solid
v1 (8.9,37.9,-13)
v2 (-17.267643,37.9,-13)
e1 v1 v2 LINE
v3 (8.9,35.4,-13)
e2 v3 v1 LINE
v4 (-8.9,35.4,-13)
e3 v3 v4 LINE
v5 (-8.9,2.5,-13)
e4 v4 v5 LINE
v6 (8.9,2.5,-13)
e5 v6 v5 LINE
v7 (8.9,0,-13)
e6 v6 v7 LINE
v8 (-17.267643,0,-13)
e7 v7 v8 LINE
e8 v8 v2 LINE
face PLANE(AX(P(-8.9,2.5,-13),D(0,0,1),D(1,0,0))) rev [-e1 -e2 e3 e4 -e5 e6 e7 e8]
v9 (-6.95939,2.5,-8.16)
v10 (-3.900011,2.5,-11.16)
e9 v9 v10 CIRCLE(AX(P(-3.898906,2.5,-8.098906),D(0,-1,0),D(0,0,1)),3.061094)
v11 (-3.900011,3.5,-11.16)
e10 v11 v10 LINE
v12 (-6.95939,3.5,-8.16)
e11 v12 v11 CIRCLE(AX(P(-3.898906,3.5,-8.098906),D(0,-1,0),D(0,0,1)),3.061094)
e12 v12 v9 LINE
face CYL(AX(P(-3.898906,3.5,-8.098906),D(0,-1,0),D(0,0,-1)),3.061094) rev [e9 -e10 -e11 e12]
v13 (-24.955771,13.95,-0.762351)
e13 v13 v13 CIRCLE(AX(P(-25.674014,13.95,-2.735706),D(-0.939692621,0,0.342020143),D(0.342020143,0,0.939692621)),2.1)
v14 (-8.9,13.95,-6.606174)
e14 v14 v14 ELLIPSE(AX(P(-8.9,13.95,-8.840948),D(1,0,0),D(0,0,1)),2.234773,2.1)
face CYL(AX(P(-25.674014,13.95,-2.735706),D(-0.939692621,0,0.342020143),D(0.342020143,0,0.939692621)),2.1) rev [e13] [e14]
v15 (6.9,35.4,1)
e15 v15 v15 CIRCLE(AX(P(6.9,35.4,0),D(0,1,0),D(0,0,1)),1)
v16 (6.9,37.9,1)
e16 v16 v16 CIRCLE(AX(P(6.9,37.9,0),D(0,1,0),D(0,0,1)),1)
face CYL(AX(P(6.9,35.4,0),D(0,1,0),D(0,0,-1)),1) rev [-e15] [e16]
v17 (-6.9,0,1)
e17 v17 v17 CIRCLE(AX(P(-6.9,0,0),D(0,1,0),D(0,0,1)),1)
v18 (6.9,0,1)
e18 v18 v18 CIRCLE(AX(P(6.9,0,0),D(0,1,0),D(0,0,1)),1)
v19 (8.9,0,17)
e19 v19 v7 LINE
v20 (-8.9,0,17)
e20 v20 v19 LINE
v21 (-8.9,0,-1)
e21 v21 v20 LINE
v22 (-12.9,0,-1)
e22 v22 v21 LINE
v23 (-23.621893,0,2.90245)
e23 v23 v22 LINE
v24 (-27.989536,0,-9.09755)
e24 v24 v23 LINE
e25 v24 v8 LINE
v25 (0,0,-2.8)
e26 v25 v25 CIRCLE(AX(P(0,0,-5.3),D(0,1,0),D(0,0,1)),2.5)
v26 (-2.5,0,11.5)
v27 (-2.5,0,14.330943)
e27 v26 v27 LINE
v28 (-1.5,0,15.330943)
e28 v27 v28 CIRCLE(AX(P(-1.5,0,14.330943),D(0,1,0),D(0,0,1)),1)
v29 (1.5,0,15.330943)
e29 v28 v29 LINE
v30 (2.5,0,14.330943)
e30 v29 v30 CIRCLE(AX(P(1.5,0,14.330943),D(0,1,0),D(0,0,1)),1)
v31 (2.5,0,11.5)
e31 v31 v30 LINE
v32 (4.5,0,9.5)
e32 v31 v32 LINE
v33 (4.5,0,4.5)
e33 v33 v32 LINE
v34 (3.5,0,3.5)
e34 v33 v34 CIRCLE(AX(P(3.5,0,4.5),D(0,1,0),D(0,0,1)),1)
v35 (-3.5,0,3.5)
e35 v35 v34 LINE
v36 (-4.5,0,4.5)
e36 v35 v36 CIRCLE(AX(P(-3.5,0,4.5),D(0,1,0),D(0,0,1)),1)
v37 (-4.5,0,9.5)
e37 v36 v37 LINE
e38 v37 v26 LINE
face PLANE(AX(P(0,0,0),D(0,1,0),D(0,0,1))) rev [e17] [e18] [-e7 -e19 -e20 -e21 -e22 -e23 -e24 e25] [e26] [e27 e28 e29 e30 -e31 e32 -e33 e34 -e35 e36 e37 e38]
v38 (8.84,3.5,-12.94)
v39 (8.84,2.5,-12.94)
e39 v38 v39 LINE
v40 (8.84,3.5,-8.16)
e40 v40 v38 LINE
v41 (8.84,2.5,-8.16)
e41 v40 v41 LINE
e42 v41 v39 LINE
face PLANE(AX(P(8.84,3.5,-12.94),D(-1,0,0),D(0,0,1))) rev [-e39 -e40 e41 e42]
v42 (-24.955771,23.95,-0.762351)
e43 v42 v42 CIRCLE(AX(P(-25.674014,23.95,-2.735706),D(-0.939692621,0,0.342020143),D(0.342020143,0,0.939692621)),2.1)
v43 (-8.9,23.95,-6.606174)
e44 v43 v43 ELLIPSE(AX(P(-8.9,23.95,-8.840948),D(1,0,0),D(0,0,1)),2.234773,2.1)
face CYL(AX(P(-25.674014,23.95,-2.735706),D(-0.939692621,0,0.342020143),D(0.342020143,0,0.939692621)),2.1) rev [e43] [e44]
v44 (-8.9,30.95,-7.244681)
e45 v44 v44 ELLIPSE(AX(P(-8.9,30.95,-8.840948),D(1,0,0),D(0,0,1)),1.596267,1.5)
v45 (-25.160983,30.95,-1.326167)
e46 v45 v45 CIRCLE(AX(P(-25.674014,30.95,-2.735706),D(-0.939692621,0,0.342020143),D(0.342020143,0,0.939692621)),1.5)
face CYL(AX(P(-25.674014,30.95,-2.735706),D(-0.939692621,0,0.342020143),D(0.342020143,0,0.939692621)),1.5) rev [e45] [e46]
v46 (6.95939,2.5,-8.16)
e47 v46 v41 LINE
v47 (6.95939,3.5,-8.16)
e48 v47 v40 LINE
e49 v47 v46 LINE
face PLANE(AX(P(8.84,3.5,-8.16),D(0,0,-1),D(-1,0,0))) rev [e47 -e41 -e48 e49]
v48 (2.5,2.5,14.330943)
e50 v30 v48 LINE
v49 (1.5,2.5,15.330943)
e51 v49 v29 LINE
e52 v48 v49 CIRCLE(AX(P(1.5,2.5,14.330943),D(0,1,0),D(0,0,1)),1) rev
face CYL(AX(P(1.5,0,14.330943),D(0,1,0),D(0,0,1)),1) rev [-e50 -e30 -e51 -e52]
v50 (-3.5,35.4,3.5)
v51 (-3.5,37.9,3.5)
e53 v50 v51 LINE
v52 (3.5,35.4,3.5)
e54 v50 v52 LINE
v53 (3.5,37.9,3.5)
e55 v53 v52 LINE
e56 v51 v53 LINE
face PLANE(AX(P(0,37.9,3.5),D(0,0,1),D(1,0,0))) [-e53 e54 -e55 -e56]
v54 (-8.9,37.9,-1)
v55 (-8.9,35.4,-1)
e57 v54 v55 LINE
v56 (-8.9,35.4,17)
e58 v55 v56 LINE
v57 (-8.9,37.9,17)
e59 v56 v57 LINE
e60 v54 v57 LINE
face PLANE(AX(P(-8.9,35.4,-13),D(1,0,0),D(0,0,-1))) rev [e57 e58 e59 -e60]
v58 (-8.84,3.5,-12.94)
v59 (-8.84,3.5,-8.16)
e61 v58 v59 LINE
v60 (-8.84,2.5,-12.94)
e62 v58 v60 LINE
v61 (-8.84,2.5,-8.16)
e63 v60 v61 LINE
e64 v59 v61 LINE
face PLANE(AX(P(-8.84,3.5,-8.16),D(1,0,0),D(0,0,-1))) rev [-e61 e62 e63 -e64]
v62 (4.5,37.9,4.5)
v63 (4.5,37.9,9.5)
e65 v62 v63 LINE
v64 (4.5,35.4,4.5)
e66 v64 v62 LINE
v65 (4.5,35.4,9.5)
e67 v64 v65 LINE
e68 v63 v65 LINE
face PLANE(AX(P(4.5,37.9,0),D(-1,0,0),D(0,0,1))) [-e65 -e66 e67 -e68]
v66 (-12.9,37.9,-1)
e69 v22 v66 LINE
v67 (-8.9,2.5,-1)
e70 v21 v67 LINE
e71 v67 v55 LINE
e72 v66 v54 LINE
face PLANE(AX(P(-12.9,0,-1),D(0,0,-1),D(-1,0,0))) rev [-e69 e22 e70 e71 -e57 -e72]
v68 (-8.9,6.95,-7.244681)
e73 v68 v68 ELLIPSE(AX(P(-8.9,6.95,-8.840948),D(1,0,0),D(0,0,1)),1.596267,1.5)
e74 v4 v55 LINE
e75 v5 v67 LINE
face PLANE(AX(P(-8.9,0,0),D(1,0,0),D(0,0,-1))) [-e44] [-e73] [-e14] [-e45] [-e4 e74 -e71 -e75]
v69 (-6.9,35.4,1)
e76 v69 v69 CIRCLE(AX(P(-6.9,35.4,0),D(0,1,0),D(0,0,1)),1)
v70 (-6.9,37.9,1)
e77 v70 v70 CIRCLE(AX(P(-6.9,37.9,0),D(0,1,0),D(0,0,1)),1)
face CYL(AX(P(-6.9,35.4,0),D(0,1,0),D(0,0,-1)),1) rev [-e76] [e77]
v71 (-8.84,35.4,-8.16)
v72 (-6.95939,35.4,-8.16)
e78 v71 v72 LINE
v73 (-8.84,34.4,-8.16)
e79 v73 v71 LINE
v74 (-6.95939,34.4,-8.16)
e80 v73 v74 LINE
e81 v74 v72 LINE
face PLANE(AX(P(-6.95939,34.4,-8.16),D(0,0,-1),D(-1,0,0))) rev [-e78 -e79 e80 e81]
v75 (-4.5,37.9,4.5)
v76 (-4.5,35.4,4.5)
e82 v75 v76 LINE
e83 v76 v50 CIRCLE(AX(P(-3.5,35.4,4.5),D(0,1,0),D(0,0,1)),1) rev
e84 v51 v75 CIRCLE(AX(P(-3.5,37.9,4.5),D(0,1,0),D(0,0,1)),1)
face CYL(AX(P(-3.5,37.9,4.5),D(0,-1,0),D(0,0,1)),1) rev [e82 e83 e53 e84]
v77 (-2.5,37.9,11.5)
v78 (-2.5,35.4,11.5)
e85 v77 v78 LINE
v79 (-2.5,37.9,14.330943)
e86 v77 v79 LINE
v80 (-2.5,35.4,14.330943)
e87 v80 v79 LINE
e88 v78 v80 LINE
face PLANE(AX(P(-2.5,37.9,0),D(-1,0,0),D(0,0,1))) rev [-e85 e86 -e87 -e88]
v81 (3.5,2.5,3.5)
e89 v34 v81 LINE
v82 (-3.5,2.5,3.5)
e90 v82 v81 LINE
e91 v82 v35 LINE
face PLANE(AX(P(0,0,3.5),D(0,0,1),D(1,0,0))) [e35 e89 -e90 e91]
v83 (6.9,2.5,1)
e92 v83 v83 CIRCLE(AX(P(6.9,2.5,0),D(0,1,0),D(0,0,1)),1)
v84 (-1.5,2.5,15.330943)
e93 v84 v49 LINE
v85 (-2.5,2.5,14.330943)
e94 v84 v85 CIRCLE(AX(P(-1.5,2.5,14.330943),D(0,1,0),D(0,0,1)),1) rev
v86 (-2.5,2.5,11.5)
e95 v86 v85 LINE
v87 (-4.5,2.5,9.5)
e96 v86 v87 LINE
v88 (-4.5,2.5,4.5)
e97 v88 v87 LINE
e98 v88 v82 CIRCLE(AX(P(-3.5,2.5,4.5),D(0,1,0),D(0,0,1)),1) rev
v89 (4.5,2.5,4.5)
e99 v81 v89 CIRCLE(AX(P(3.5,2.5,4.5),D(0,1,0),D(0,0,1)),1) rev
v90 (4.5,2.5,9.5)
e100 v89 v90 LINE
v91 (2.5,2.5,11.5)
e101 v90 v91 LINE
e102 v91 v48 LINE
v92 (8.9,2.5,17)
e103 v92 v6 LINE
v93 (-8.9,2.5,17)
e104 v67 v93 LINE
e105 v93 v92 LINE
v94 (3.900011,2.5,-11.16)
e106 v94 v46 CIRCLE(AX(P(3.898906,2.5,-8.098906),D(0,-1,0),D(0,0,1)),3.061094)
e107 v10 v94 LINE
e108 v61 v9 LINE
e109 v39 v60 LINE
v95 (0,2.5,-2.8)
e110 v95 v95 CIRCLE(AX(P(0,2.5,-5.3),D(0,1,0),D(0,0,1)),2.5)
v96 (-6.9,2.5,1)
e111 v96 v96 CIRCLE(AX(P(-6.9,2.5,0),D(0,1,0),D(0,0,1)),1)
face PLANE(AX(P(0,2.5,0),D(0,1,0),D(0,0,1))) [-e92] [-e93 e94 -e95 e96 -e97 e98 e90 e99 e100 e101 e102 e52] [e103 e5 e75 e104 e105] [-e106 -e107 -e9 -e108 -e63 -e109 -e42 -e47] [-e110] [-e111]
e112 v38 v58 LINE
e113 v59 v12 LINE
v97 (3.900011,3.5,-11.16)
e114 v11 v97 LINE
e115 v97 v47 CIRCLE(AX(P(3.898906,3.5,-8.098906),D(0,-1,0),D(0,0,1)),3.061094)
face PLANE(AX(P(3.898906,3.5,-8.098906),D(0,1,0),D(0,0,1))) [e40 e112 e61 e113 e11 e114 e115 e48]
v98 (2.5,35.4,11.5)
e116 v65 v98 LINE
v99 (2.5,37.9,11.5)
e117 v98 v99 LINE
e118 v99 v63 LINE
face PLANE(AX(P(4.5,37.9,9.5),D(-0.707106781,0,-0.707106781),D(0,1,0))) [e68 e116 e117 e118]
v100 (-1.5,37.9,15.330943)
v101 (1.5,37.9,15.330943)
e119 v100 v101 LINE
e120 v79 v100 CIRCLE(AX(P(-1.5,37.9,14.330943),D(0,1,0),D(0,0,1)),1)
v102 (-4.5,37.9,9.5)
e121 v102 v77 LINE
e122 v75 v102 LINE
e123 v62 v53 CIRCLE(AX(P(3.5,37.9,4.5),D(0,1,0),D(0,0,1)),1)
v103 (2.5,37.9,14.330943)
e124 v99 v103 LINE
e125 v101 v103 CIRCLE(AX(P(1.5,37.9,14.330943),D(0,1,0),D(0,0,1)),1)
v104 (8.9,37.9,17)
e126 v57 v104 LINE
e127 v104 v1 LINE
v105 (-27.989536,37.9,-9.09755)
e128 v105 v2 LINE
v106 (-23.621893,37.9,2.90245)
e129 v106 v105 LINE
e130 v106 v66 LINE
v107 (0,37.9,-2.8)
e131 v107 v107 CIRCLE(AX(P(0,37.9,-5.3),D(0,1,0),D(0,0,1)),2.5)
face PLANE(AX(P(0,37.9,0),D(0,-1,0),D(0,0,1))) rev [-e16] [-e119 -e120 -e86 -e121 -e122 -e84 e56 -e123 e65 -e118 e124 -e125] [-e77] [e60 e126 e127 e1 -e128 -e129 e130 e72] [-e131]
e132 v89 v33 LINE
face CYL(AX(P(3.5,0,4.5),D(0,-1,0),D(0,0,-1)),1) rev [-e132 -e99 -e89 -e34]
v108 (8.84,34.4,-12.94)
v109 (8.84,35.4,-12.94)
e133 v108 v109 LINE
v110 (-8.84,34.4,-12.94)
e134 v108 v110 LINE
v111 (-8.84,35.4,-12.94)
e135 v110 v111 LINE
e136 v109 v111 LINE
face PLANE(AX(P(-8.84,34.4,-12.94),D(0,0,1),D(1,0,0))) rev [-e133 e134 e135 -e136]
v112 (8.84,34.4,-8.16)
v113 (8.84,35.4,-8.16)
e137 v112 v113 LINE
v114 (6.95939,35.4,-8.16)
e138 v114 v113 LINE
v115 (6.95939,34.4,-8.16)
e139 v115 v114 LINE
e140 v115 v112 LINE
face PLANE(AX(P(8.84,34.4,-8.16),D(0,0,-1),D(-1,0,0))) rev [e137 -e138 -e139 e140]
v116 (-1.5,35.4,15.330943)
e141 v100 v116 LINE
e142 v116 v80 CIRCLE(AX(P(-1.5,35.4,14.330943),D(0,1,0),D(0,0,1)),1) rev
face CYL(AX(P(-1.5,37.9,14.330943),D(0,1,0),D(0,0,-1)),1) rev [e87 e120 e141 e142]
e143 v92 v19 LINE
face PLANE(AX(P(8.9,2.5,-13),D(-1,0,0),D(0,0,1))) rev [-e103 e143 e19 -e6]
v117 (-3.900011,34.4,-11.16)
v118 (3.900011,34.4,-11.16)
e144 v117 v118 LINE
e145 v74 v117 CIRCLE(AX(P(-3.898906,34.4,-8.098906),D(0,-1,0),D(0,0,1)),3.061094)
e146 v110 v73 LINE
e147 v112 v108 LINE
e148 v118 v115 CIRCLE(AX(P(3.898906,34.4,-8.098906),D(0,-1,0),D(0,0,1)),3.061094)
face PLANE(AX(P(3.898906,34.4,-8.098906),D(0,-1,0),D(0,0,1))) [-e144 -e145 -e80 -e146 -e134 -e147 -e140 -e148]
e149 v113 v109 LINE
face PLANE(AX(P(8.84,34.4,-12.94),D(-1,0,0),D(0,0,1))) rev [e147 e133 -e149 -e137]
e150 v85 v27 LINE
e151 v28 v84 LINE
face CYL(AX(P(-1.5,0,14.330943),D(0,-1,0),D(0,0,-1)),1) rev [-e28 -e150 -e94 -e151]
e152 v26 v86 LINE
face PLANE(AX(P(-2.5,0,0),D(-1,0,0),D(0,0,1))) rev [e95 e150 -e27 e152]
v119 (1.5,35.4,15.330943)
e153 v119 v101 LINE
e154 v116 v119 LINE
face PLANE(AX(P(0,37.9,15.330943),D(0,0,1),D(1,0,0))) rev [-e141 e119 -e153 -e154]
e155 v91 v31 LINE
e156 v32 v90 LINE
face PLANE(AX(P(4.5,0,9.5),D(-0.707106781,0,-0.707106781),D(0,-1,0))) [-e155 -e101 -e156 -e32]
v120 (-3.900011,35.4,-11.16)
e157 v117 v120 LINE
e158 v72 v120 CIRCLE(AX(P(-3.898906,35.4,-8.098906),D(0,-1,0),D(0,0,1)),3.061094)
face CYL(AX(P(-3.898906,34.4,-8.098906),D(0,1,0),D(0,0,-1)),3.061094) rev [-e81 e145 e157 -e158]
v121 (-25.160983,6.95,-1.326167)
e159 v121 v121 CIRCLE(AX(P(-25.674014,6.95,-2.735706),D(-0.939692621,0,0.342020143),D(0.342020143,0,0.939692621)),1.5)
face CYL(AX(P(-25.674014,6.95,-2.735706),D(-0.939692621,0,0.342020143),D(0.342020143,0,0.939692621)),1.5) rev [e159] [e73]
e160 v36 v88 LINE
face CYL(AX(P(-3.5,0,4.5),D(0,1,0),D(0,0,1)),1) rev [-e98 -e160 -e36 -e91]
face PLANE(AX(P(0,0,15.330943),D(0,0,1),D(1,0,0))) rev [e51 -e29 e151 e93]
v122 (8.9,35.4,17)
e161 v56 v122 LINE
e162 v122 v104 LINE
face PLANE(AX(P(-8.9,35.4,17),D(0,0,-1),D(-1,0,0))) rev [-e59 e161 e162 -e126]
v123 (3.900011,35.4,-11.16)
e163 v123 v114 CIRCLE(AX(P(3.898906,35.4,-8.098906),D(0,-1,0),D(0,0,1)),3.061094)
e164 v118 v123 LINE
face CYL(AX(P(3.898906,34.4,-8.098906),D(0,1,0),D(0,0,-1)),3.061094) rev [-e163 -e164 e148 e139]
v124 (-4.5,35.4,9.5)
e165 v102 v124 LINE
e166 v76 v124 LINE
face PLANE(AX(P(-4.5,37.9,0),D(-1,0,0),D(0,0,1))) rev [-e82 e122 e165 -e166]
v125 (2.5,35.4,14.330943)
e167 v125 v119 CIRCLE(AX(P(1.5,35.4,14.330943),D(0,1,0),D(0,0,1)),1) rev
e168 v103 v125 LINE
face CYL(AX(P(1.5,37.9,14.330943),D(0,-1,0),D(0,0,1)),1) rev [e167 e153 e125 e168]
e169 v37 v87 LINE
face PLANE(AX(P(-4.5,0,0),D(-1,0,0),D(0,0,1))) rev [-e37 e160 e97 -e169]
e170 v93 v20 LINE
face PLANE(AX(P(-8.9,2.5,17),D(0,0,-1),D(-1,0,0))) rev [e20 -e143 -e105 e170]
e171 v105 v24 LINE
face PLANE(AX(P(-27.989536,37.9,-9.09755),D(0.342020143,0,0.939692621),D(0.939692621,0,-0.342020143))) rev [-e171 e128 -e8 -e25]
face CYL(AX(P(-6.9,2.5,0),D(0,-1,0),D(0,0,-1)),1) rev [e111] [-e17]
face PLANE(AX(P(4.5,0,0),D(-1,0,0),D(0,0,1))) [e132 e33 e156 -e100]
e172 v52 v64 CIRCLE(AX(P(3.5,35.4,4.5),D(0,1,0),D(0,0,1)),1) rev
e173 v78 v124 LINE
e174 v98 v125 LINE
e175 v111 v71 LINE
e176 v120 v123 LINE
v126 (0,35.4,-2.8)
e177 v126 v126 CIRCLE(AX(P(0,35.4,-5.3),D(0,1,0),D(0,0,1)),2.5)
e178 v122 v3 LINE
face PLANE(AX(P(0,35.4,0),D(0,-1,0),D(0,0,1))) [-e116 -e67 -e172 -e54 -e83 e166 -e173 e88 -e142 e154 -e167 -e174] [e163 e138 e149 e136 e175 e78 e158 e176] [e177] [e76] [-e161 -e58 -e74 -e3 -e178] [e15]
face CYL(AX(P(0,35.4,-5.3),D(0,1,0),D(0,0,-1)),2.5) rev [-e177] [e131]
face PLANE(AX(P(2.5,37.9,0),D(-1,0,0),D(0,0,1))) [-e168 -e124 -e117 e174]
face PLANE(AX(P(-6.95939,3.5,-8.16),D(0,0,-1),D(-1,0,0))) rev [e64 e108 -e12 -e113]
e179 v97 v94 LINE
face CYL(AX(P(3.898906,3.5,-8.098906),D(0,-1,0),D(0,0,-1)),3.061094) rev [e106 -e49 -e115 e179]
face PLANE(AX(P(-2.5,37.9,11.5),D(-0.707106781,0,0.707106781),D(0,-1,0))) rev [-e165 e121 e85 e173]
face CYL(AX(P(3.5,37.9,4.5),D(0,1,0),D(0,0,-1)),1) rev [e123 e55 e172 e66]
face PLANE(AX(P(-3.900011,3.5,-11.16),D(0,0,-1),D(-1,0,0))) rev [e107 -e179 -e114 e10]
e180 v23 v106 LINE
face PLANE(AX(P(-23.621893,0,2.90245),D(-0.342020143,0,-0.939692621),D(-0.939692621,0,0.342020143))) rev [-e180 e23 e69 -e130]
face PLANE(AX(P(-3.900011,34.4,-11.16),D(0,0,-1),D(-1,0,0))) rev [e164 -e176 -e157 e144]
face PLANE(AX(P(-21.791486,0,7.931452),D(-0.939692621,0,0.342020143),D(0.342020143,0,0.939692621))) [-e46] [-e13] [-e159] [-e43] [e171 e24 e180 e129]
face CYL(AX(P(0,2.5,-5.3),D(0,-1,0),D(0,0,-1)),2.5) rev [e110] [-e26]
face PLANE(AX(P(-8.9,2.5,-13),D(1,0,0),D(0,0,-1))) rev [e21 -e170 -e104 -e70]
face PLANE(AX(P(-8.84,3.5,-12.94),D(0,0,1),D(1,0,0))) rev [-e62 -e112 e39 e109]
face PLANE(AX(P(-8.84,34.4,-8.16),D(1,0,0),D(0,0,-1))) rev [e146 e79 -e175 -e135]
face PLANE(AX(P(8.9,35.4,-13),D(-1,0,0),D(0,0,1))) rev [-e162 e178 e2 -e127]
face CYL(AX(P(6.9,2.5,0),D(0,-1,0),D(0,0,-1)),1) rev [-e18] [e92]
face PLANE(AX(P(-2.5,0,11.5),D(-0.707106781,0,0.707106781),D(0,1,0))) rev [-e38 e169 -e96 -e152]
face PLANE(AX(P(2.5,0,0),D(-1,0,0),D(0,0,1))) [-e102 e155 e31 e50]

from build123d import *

# Parameters (mm, degrees)
SKETCH1_W                  = 17.8
SKETCH1_H                  = 30
SKETCH1_R                  = 1
SKETCH1_R_2                = 2.5
BOSS_EXTRUDE1_DEPTH        = 2.5
SKETCH2_W                  = 9
SKETCH2_H                  = 6
SKETCH2_W_2                = 5
SKETCH2_H_2                = 5.830943002
CUT_EXTRUDE1_DEPTH         = 20.350968968
CHAMFER1_SIZE              = 2
FILLET1_R                  = 1
BOSS_EXTRUDE2_DEPTH        = 1
SKETCH4_W                  = 12
SKETCH4_H                  = 18.95
BOSS_EXTRUDE3_DEPTH        = 4
BOSS_EXTRUDE4_DEPTH        = 37.9
SKETCH6_W                  = 12.770133269
SKETCH6_H                  = 37.9
BOSS_EXTRUDE5_DEPTH        = 11.41
F_3_0_MM_DOWEL_HOLES1_D    = 3
F_4_2_4_2_DIAMETER_HOLE1_D = 4.2


with BuildPart() as part:
    # Sketch1 → Boss-Extrude1 (new body)
    with BuildSketch(Plane(origin=(0, 0, 0), x_dir=(1, 0, 0), z_dir=(0, 1, 0))):
        with Locations((0, -2)):
            Rectangle(SKETCH1_W, SKETCH1_H)
        with Locations(Location((-6.9, 0, 0), (0, 0, 270))):
            Circle(SKETCH1_R, mode=Mode.SUBTRACT)
        with Locations(Location((6.9, 0, 0), (0, 0, 270))):
            Circle(SKETCH1_R, mode=Mode.SUBTRACT)
        with Locations(Location((0, 5.3, 0), (0, 0, 270))):
            Circle(SKETCH1_R_2, mode=Mode.SUBTRACT)
    extrude(amount=BOSS_EXTRUDE1_DEPTH)

    # Sketch2 → Cut-Extrude1 (cut, through all)
    with BuildSketch(Plane(origin=(0, 2.5, 0), x_dir=(1, 0, 0), z_dir=(0, 1, 0))):
        with Locations((0, -6.5)):
            Rectangle(SKETCH2_W, SKETCH2_H)
        with Locations((0, -12.415471501)):
            Rectangle(SKETCH2_W_2, SKETCH2_H_2)
    extrude(amount=-CUT_EXTRUDE1_DEPTH, mode=Mode.SUBTRACT)

    # Chamfer1
    chamfer1_edges = [part.edges().sort_by_distance(p)[0] for p in [
        (2.5, 1.25, 9.5),
        (-2.5, 1.25, 9.5),
    ]]
    chamfer(chamfer1_edges, length=CHAMFER1_SIZE - 0.0001)  # a hair under: the kernel refuses the full size

    # Fillet1
    fillet1_edges = [part.edges().sort_by_distance(p)[0] for p in [
        (4.5, 1.25, 3.5),
        (2.5, 1.25, 15.330943002),
        (-2.5, 1.25, 15.330943002),
        (-4.5, 1.25, 3.5),
    ]]
    fillet(fillet1_edges, radius=FILLET1_R)

    # Sketch3 → Boss-Extrude2 (add)
    with BuildSketch(Plane(origin=(0, 2.5, 0), x_dir=(1, 0, 0), z_dir=(0, 1, 0))):
        with BuildLine():
            Line((8.84, 8.16), (6.959390471, 8.16))
            ThreePointArc((6.959390471, 8.16), (6.042112051, 10.284532913), (3.900010938, 11.159999998))
            Line((3.900010938, 11.159999998), (-3.900010938, 11.159999998))
            ThreePointArc((-3.900010938, 11.159999998), (-6.04211205, 10.284532912), (-6.959390471, 8.16))
            Line((-6.959390471, 8.16), (-8.84, 8.16))
            Line((-8.84, 8.16), (-8.84, 12.94))
            Line((-8.84, 12.94), (8.84, 12.94))
            Line((8.84, 12.94), (8.84, 8.16))
        make_face()
    extrude(amount=BOSS_EXTRUDE2_DEPTH)

    # Sketch4 → Boss-Extrude3 (add)
    with BuildSketch(Plane.ZY.offset(8.9)):
        with Locations((-7, 9.475)):
            Rectangle(SKETCH4_W, SKETCH4_H)
    extrude(amount=BOSS_EXTRUDE3_DEPTH)

    # Mirror2: part across plane


with BuildPart() as part_1:
    add(part.part)
    add(part.part.mirror(Plane.ZX.offset(18.95)))

    # Sketch5 → Boss-Extrude4 (add)
    with BuildSketch(Plane(origin=(0, 37.9, 0), x_dir=(1, 0, 0), z_dir=(0, 1, 0))):
        Polygon((-12.9, 1), (-17.267642811, 13), (-12.9, 13), align=None)
    extrude(amount=-BOSS_EXTRUDE4_DEPTH)

    # Sketch6 → Boss-Extrude5 (add)
    with BuildSketch(Plane(origin=(-11.069592853, 0, 4.029002304), x_dir=(0.3420201433256634, 0, 0.9396926207859103), z_dir=(-0.9396926207859103, 0, 0.3420201433256634))):
        with Locations((-11.736819105, 18.95)):
            Rectangle(SKETCH6_W, SKETCH6_H)
    extrude(amount=BOSS_EXTRUDE5_DEPTH)

    # Ø3.0 mm Dowel Holes1 (through all)
    with Locations(Plane(origin=(-23.72675034, 0, 2.614356121), x_dir=(-0.34202014332566333, 0, -0.9396926207859103), z_dir=(-0.9396926207859104, 0, 0.3420201433256634))):
        with Locations((5.693417073, -6.95), (5.693417073, -30.95)):
            Hole(F_3_0_MM_DOWEL_HOLES1_D / 2)

    # Ø4.2 (4.2) Diameter Hole1 (through all)
    with Locations(Plane(origin=(-21.791485656, 0, 7.931452139), x_dir=(0.34202014332566333, 0, 0.9396926207859103), z_dir=(-0.9396926207859104, 0, 0.3420201433256634))):
        with Locations((-11.35175247, 13.95), (-11.35175247, 23.95)):
            Hole(F_4_2_4_2_DIAMETER_HOLE1_D / 2)


solid = part_1.part
